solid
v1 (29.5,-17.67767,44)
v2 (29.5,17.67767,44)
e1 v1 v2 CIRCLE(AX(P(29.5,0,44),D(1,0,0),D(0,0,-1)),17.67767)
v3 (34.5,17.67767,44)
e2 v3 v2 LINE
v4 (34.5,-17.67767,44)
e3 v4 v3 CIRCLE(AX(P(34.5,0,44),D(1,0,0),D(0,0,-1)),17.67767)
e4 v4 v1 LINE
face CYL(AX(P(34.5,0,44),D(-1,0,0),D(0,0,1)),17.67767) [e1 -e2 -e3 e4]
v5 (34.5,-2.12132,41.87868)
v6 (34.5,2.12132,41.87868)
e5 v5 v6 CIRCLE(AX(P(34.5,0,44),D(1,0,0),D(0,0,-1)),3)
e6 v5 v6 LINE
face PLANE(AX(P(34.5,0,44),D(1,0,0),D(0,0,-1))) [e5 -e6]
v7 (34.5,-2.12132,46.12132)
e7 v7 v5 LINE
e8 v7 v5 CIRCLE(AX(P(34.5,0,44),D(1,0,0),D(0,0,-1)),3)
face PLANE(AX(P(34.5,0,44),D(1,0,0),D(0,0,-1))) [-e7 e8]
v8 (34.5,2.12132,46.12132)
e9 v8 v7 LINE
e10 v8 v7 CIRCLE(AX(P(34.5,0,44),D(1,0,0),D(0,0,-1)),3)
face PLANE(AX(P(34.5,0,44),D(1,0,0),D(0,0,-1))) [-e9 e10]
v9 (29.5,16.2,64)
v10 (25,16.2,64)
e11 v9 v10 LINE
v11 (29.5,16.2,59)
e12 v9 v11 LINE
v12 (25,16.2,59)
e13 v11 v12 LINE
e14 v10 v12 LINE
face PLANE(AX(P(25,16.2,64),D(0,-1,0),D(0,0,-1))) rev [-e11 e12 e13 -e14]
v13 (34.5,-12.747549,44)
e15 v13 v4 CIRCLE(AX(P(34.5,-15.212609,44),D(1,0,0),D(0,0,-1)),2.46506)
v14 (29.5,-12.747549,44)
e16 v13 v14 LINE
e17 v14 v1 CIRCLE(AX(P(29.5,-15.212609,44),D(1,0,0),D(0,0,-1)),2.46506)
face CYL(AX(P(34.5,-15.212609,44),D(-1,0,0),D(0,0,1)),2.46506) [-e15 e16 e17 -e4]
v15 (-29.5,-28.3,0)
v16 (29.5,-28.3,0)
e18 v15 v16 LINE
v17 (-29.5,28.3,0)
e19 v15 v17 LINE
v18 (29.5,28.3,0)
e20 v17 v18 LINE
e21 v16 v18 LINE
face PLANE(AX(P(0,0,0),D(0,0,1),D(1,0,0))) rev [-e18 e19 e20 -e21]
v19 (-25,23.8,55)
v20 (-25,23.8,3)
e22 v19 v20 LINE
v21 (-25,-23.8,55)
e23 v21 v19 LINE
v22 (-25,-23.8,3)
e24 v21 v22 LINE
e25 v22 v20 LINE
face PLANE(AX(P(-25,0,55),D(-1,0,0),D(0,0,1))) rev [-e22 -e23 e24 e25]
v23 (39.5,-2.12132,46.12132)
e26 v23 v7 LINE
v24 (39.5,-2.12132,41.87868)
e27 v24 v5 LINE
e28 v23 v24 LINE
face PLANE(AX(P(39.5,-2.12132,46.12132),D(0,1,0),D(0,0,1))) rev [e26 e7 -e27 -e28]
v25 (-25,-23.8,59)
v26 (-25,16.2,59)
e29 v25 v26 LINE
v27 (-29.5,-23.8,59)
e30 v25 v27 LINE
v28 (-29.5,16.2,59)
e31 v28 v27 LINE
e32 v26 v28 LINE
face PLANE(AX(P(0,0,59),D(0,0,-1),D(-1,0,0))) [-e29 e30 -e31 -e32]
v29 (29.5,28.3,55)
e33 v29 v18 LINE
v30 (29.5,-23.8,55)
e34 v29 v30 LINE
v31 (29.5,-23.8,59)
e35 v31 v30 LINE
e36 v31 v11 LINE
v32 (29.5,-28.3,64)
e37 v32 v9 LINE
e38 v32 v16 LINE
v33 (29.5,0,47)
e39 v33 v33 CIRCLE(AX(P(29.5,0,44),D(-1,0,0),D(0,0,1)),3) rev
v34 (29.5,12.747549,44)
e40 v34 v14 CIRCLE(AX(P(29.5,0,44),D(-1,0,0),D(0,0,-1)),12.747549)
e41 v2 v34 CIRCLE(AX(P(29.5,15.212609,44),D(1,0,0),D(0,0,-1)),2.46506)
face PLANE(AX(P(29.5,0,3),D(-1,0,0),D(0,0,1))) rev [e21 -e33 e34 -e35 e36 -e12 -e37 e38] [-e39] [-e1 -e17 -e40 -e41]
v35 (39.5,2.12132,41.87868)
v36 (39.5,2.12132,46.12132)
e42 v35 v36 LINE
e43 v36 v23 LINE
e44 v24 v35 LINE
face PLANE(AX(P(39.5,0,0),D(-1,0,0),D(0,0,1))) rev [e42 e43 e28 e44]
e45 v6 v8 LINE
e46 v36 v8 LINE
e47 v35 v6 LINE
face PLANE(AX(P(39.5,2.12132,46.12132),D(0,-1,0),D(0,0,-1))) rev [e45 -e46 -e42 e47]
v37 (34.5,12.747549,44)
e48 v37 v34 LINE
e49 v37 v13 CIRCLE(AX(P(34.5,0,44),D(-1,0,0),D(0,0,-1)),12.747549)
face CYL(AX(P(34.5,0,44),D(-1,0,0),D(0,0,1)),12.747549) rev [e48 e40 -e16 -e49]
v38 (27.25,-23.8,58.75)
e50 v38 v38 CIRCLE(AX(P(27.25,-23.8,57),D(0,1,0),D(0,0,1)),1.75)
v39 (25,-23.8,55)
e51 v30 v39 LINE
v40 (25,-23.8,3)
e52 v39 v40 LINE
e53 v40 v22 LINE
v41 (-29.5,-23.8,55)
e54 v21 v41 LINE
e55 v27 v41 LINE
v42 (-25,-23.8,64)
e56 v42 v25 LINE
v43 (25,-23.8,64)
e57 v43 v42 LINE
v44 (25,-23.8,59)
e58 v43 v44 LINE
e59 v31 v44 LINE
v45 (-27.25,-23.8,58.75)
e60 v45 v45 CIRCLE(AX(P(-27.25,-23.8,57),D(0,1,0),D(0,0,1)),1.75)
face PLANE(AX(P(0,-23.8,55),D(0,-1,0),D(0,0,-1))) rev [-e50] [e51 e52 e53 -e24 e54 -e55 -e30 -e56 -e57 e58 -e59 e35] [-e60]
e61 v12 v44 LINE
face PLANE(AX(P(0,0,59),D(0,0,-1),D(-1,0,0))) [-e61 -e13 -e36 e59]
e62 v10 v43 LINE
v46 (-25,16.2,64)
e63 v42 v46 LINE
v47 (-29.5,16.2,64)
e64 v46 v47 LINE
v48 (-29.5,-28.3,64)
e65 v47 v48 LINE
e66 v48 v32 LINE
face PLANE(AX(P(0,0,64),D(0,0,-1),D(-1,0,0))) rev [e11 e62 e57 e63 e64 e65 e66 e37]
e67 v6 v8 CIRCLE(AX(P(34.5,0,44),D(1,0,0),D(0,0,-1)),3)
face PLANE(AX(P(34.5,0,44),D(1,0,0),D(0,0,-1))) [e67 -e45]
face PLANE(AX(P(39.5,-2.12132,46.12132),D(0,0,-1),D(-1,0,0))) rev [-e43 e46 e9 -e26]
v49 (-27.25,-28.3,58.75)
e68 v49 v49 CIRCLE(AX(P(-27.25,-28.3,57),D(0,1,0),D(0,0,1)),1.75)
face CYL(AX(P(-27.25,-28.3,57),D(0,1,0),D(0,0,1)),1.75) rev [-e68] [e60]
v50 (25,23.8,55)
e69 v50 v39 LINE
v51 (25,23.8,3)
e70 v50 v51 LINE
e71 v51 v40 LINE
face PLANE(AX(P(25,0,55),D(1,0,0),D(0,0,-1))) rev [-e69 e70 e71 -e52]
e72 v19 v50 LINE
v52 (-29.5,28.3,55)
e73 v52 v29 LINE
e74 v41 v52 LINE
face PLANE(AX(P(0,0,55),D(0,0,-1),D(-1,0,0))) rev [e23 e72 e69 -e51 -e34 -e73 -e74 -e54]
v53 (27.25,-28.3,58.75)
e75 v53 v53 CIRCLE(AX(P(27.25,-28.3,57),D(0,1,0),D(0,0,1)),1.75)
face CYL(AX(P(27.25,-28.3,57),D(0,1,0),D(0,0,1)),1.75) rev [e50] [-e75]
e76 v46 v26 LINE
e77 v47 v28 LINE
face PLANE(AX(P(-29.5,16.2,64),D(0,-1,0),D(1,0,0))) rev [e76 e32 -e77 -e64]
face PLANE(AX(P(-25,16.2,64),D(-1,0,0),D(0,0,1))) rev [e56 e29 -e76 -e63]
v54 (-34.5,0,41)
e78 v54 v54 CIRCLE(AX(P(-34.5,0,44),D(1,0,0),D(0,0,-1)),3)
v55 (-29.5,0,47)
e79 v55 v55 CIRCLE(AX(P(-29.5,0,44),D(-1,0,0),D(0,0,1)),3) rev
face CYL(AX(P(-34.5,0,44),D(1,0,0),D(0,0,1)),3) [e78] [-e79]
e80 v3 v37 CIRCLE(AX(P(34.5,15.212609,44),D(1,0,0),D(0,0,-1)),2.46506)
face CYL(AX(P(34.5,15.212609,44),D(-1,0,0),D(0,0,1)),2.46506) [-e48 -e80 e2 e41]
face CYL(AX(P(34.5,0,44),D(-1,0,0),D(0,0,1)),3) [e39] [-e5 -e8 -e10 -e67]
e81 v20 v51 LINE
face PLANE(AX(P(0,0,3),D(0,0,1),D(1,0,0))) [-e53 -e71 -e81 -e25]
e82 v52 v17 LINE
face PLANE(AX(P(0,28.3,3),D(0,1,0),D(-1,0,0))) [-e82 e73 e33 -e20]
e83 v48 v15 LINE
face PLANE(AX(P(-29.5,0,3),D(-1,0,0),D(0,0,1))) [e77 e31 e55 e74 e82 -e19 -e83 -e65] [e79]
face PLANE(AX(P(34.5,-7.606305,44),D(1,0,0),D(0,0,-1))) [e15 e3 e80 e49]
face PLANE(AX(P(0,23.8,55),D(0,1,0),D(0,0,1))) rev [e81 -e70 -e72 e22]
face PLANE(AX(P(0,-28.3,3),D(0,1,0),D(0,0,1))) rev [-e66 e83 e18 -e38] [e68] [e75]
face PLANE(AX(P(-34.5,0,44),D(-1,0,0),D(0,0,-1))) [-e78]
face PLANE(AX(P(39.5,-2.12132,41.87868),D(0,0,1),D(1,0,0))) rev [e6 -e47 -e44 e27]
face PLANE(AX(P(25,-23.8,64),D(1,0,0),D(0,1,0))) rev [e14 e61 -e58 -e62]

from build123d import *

# Parameters (mm, degrees)
SKETCH1_W           = 59
SKETCH1_H           = 56.6
SKETCH1_W_2         = 50
SKETCH1_H_2         = 47.6
BOSS_EXTRUDE1_DEPTH = 3
BOSS_EXTRUDE2_START = 3
SKETCH1_3_W         = 59
SKETCH1_3_H         = 56.6
SKETCH1_3_W_2       = 50
SKETCH1_3_H_2       = 47.6
BOSS_EXTRUDE2_DEPTH = 52
SKETCH2_W           = 59
SKETCH2_H           = 4.5
BOSS_EXTRUDE3_DEPTH = 4
BOSS_EXTRUDE4_DEPTH = 5
SKETCH4_R           = 1.75
CUT_EXTRUDE1_DEPTH  = 88.639374713
SKETCH5_R           = 3
BOSS_EXTRUDE5_DEPTH = 5
MIRROR1_START       = -34.5
MIRROR1_OUTLINE_R   = 3
MIRROR1_DEPTH       = 5
SKETCH6_W           = 4.242640688
SKETCH6_H           = 4.242640688
BOSS_EXTRUDE6_DEPTH = 5


# Read off the part's stored shape, not the designer's step: Mirror1
with BuildPart() as part:
    # Sketch1 → Boss-Extrude1 (new body)
    # profile 1 of 2: a face of its own
    with BuildSketch(Plane.XY):
        Rectangle(SKETCH1_W, SKETCH1_H)
        Rectangle(SKETCH1_W_2, SKETCH1_H_2, mode=Mode.SUBTRACT)
    # profile 2 of 2: a face of its own
    with BuildSketch(Plane.XY):
        Rectangle(SKETCH1_W_2, SKETCH1_H_2)
    extrude(amount=BOSS_EXTRUDE1_DEPTH)

    # Sketch1<3> → Boss-Extrude2 (add)
    with BuildSketch(Plane.XY.offset(BOSS_EXTRUDE2_START)):
        Rectangle(SKETCH1_3_W, SKETCH1_3_H)
        Rectangle(SKETCH1_3_W_2, SKETCH1_3_H_2, mode=Mode.SUBTRACT)
    extrude(amount=BOSS_EXTRUDE2_DEPTH)

    # Sketch2 → Boss-Extrude3 (add)
    with BuildSketch(Plane.XY.offset(55)):
        with Locations((0, -26.05)):
            Rectangle(SKETCH2_W, SKETCH2_H)
    extrude(amount=BOSS_EXTRUDE3_DEPTH)

    # Sketch3 → Boss-Extrude4 (add)
    with BuildSketch(Plane.XY.offset(59)):
        Polygon((-29.5, -28.3), (-29.5, 16.2), (-25, 16.2), (-25, -23.8), (25, -23.8), (25, 16.2), (29.5, 16.2), (29.5, -28.3), align=None)
    extrude(amount=BOSS_EXTRUDE4_DEPTH)

    # Sketch4 → Cut-Extrude1 (cut, through all)
    with BuildSketch(Plane(origin=(0, -23.8, 0), x_dir=(1, 0, 0), z_dir=(0, 1, 0))):
        with Locations(Location((-27.25, -57, 0), (0, 0, 270))):
            Circle(SKETCH4_R)
        with Locations(Location((27.25, -57, 0), (0, 0, 270))):
            Circle(SKETCH4_R)
    extrude(amount=-CUT_EXTRUDE1_DEPTH, mode=Mode.SUBTRACT)

    # Sketch5 → Boss-Extrude5 (add)
    with BuildSketch(Plane(origin=(29.5, 0, 0), x_dir=(0, 0, -1), z_dir=(1, 0, 0))):
        with Locations(Location((-44, 0, 0), (0, 0, 180))):
            Circle(SKETCH5_R)
        with BuildLine():
            ThreePointArc((-44, -17.67766953), (-26.32233047, 0), (-44, 17.67766953))
            ThreePointArc((-44, 17.67766953), (-46.465060373, 15.212609157), (-44, 12.747548784))
            ThreePointArc((-44, 12.747548784), (-31.252451216, 0), (-44, -12.747548784))
            ThreePointArc((-44, -12.747548784), (-46.465060373, -15.212609157), (-44, -17.67766953))
        make_face()
    extrude(amount=BOSS_EXTRUDE5_DEPTH)

    # Mirror1 outline → Mirror1 (add)
    with BuildSketch(Plane.YZ.offset(MIRROR1_START)):
        with Locations((0, 44)):
            Circle(MIRROR1_OUTLINE_R)
    extrude(amount=MIRROR1_DEPTH)

    # Sketch6 → Boss-Extrude6 (add)
    with BuildSketch(Plane(origin=(34.5, 0, 0), x_dir=(0, 0, -1), z_dir=(1, 0, 0))):
        with Locations((-44, 0)):
            Rectangle(SKETCH6_W, SKETCH6_H)
    extrude(amount=BOSS_EXTRUDE6_DEPTH)


solid = part.part
